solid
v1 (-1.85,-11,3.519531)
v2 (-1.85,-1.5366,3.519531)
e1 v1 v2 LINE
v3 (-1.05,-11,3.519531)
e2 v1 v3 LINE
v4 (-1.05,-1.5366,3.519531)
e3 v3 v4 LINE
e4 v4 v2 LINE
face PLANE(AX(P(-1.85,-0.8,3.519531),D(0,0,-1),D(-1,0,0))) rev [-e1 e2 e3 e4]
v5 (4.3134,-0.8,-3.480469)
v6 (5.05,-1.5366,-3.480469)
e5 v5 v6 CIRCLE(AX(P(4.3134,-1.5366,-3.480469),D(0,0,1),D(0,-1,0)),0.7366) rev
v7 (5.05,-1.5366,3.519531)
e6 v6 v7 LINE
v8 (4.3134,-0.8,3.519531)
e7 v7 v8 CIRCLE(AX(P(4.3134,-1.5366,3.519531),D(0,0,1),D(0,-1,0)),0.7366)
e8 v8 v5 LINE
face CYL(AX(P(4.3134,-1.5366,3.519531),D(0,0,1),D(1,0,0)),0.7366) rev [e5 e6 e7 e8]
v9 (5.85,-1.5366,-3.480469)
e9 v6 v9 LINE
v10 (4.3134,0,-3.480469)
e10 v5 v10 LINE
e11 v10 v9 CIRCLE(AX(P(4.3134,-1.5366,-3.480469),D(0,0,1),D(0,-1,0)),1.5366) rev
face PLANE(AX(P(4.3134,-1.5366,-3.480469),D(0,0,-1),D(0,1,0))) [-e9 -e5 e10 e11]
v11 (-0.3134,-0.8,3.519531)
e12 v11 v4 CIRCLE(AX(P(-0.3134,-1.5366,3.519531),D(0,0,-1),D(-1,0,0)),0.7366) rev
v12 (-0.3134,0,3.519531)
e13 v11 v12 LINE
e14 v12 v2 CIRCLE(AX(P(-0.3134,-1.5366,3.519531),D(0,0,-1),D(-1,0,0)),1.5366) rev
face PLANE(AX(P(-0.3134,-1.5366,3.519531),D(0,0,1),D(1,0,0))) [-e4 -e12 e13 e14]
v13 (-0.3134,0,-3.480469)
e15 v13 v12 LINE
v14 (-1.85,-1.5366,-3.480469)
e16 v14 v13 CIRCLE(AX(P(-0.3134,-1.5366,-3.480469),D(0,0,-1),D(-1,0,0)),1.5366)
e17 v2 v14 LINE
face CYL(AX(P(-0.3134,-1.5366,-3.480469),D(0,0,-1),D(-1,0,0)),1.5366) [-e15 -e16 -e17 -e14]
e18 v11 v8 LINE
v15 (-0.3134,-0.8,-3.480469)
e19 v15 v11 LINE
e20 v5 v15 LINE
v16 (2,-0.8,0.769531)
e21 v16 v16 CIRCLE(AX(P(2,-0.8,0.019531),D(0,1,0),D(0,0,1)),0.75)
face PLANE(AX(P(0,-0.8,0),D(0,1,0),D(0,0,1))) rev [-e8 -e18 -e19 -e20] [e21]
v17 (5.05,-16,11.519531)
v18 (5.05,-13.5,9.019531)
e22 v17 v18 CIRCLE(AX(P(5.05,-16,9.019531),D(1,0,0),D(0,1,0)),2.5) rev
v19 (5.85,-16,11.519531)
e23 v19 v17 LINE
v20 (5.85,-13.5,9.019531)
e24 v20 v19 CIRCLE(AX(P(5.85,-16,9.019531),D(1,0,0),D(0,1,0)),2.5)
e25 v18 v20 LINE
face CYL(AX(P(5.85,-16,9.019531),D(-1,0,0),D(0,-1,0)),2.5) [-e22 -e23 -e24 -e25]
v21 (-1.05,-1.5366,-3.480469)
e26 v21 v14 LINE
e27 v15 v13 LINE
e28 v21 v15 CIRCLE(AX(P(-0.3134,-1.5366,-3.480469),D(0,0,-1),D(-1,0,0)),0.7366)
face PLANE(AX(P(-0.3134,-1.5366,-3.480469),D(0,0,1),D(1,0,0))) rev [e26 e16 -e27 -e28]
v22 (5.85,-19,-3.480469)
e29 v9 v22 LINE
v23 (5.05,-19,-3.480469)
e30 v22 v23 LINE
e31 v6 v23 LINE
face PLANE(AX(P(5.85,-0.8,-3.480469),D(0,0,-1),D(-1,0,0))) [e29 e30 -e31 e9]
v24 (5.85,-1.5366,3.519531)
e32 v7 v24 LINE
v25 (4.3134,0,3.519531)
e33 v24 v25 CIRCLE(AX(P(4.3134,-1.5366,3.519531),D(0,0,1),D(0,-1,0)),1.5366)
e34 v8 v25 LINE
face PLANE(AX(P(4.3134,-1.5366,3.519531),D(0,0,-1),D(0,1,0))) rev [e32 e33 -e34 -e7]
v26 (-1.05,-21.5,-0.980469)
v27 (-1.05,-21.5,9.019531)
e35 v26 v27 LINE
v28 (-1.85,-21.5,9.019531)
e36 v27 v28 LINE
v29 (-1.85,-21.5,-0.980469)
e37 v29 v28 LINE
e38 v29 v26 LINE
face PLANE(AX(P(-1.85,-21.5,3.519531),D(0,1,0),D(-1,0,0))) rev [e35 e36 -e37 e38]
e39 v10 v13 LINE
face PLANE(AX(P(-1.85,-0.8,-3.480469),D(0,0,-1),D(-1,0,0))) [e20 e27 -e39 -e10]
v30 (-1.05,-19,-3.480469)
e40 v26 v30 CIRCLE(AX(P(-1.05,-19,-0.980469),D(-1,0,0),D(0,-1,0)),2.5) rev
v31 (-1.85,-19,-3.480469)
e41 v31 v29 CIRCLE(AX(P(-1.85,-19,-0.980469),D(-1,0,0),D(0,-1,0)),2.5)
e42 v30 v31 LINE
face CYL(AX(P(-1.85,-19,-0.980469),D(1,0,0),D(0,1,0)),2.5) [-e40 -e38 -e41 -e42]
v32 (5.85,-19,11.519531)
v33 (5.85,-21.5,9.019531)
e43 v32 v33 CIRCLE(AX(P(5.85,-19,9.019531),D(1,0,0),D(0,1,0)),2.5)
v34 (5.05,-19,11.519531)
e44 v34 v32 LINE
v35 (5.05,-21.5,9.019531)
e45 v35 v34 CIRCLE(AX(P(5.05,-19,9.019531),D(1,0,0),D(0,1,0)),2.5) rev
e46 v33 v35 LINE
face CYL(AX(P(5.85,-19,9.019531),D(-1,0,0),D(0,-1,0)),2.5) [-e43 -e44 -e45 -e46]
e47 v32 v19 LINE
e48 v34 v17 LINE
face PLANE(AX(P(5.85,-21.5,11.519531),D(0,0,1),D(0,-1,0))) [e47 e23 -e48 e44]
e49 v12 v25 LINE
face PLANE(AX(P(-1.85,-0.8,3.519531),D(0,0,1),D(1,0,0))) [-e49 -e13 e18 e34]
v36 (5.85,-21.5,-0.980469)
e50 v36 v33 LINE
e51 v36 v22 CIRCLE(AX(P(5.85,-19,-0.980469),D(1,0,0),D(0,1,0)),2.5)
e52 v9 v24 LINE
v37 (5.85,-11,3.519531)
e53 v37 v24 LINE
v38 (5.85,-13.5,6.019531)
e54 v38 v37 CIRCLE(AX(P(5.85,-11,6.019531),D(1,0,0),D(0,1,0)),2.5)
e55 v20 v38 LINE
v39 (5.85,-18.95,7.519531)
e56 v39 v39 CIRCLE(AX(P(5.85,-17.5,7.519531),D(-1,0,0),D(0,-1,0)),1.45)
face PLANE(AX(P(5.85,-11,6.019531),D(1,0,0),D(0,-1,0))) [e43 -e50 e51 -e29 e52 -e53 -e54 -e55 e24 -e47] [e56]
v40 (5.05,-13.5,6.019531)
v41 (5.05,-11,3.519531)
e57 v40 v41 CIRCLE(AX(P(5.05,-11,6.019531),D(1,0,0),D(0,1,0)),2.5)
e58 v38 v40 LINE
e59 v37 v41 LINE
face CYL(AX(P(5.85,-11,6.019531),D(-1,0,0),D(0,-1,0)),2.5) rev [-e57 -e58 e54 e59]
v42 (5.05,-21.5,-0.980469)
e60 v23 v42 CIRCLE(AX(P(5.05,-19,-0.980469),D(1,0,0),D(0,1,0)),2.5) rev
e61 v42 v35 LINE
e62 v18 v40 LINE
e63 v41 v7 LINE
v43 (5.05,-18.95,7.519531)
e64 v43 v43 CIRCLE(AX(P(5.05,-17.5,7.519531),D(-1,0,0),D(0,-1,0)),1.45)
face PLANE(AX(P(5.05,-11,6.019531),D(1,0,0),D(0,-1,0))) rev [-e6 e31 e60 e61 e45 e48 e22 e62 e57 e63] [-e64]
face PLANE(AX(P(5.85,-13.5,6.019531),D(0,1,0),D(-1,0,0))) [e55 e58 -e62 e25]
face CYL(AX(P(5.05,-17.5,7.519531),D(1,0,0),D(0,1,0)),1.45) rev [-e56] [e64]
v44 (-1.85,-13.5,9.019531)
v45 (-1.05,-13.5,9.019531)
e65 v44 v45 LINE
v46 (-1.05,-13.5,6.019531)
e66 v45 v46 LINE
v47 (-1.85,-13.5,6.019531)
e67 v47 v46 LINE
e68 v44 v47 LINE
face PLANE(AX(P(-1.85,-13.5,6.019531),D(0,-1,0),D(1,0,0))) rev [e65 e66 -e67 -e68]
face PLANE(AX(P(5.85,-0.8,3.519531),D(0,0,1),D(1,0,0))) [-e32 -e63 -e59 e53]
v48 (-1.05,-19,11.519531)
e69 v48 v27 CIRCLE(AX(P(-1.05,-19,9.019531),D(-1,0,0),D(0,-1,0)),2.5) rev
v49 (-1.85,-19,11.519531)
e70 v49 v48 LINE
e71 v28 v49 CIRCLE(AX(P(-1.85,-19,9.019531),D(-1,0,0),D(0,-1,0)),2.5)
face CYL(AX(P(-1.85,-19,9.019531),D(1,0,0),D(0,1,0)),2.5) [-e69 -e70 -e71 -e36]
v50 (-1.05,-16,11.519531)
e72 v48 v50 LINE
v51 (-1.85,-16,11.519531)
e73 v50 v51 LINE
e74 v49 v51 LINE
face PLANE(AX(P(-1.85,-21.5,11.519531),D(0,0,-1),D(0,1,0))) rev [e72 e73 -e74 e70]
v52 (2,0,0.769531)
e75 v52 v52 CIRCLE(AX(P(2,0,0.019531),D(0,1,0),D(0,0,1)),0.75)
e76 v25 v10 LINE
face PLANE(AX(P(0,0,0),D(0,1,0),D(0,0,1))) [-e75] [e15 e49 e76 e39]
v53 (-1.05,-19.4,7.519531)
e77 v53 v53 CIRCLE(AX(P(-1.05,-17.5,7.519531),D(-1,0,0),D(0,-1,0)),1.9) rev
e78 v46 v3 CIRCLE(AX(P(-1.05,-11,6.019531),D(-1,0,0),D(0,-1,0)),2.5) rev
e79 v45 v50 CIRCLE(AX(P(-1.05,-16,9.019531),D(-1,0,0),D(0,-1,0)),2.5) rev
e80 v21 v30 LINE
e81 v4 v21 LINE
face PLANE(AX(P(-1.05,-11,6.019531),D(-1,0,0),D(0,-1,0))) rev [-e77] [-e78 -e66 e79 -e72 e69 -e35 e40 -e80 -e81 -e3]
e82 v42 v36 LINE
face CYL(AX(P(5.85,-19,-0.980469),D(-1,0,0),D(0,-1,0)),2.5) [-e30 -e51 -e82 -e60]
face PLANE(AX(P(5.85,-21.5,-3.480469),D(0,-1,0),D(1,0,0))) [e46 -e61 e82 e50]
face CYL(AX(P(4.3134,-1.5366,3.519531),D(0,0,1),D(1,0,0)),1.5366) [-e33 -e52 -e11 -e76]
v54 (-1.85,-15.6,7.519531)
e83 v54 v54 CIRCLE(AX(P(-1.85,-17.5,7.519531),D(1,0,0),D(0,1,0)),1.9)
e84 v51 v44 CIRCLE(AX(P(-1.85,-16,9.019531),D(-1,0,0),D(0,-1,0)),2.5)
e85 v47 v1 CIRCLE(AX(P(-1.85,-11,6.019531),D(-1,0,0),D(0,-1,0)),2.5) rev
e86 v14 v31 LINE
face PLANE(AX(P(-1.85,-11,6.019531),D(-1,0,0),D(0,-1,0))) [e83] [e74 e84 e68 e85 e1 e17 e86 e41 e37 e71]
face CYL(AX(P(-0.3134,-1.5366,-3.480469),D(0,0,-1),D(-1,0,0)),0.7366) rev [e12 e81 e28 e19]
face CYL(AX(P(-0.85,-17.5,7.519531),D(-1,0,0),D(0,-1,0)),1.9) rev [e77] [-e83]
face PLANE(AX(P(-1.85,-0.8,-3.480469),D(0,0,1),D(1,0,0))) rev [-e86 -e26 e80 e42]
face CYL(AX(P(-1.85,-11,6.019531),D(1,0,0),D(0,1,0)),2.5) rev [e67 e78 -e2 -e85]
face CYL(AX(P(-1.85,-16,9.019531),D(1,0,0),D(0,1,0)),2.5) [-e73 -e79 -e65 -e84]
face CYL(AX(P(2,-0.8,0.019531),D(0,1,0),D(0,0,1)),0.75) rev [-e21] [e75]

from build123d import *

# Parameters (mm, degrees)
SKETCH1_W                    = 7.7
SKETCH1_H                    = 7
BASE_FLANGE1_DEPTH           = 0.8
EDGE_FLANGE2_STRIP_W         = 4.6732
EDGE_FLANGE2_STRIP_H         = 0.8
EDGE_FLANGE2_STRIP_CUT_DEPTH = 7
EDGE_FLANGE2_DEPTH           = 7
EDGE_FLANGE2_FLAT_DEPTH      = 0.8
HOLE1_START                  = -1.85
HOLE1_OUTLINE_R              = 1.45
HOLE1_DEPTH                  = 0.8
HOLE4_START                  = -0.8
HOLE4_OUTLINE_R              = 0.75
HOLE4_DEPTH                  = 0.8
FILLET1_R                    = 2.5
SKETCH24_R                   = 1.9
CUT_EXTRUDE1_DEPTH           = 1


# Read off the part's stored shape, not the designer's step: Hole1, Hole4
# Sheet-metal steps are written as plain solids
with BuildPart() as part:
    # Sketch1 → Base-Flange1 (new body)
    with BuildSketch(Plane(origin=(0, 0, 0), x_dir=(1, 0, 0), z_dir=(0, 1, 0))):
        with Locations((2, -0.01953125)):
            Rectangle(SKETCH1_W, SKETCH1_H)
    extrude(amount=-BASE_FLANGE1_DEPTH)

    # Edge-Flange2 strip (across the edge) → Edge-Flange2 strip cut (cut)
    with BuildSketch(Plane(origin=(-1.85, -0.8, 3.51953125), x_dir=(1, 0, 0), z_dir=(0, 0, -1))):
        with Locations((-0.8, -0.4)):
            Rectangle(EDGE_FLANGE2_STRIP_W, EDGE_FLANGE2_STRIP_H)
    edge_flange2_strip_cut = extrude(amount=EDGE_FLANGE2_STRIP_CUT_DEPTH, mode=Mode.SUBTRACT)

    # Edge-Flange2 bend section (across the edge) → Edge-Flange2 (add)
    with BuildSketch(Plane(origin=(-1.85, -0.8, 3.51953125), x_dir=(1, 0, 0), z_dir=(0, 0, -1))):
        with BuildLine():
            Line((0, 0.7366), (0.8, 0.7366))
            ThreePointArc((0.8, 0.7366), (1.015745145, 0.215745145), (1.5366, 0))
            Line((1.5366, 0), (1.5366, -0.8))
            ThreePointArc((1.5366, -0.8), (0.45005972, -0.34994028), (0, 0.7366))
        make_face()
    edge_flange2 = extrude(amount=EDGE_FLANGE2_DEPTH)

    # Edge-Flange2 profile (on flange) → Edge-Flange2 flat (add)
    with BuildSketch(Plane(origin=(-1.85, -0.8, 0), x_dir=(0, 0, -1), z_dir=(-1, 0, 0))):
        with BuildLine():
            Line((3.48046875, 0.7366), (3.48046875, 20.7))
            Line((3.48046875, 20.7), (-3.51953125, 20.7))
            Line((-3.51953125, 20.7), (-11.51953125, 20.7))
            Line((-11.51953125, 20.7), (-11.51953125, 12.7))
            Line((-11.51953125, 12.7), (-6.01953125, 12.7))
            ThreePointArc((-6.01953125, 12.7), (-4.251764297, 11.967766953), (-3.51953125, 10.2))
            Line((-3.51953125, 10.2), (-3.51953125, 0.7366))
            Line((-3.51953125, 0.7366), (3.48046875, 0.7366))
        make_face()
    edge_flange2_flat = extrude(amount=-EDGE_FLANGE2_FLAT_DEPTH)

    # Hole1 outline → Hole1 (cut)
    with BuildSketch(Plane.YZ.offset(HOLE1_START)):
        with Locations((-17.5, 7.51953125)):
            Circle(HOLE1_OUTLINE_R)
    hole1 = extrude(amount=HOLE1_DEPTH, mode=Mode.SUBTRACT)

    # Hole4 outline → Hole4 (cut)
    with BuildSketch(Plane(origin=(0, 0, 0), x_dir=(1, 0, 0), z_dir=(0, 1, 0)).offset(HOLE4_START)):
        with Locations((2, -0.01953125)):
            Circle(HOLE4_OUTLINE_R)
    extrude(amount=HOLE4_DEPTH, mode=Mode.SUBTRACT)

    # Mirror1: Edge-Flange2 strip cut, Edge-Flange2, Edge-Flange2 flat, Hole1 across plane
    add(edge_flange2_strip_cut.mirror(Plane(origin=(2, 0, 0), x_dir=(0, 0, 1), z_dir=(1, 0, 0))), mode=Mode.SUBTRACT)
    add(edge_flange2.mirror(Plane(origin=(2, 0, 0), x_dir=(0, 0, 1), z_dir=(1, 0, 0))))
    add(edge_flange2_flat.mirror(Plane(origin=(2, 0, 0), x_dir=(0, 0, 1), z_dir=(1, 0, 0))))
    add(hole1.mirror(Plane(origin=(2, 0, 0), x_dir=(0, 0, 1), z_dir=(1, 0, 0))), mode=Mode.SUBTRACT)

    # Fillet1
    fillet1_edges = [part.edges().sort_by_distance(p)[0] for p in [
        (-1.45, -21.5, -3.48046875),
        (-1.45, -21.5, 11.51953125),
        (-1.45, -13.5, 11.51953125),
        (5.45, -21.5, -3.48046875),
        (5.45, -13.5, 11.51953125),
        (5.45, -21.5, 11.51953125),
    ]]
    fillet(fillet1_edges, radius=FILLET1_R)

    # Sketch24 → Cut-Extrude1 (cut)
    with BuildSketch(Plane(origin=(-1.85, 0, 0), x_dir=(0, 0, -1), z_dir=(1, 0, 0))):
        with Locations(Location((-7.51953125, -17.5, 0), (0, 0, 270))):
            Circle(SKETCH24_R)
    extrude(amount=CUT_EXTRUDE1_DEPTH, mode=Mode.SUBTRACT)


solid = part.part
